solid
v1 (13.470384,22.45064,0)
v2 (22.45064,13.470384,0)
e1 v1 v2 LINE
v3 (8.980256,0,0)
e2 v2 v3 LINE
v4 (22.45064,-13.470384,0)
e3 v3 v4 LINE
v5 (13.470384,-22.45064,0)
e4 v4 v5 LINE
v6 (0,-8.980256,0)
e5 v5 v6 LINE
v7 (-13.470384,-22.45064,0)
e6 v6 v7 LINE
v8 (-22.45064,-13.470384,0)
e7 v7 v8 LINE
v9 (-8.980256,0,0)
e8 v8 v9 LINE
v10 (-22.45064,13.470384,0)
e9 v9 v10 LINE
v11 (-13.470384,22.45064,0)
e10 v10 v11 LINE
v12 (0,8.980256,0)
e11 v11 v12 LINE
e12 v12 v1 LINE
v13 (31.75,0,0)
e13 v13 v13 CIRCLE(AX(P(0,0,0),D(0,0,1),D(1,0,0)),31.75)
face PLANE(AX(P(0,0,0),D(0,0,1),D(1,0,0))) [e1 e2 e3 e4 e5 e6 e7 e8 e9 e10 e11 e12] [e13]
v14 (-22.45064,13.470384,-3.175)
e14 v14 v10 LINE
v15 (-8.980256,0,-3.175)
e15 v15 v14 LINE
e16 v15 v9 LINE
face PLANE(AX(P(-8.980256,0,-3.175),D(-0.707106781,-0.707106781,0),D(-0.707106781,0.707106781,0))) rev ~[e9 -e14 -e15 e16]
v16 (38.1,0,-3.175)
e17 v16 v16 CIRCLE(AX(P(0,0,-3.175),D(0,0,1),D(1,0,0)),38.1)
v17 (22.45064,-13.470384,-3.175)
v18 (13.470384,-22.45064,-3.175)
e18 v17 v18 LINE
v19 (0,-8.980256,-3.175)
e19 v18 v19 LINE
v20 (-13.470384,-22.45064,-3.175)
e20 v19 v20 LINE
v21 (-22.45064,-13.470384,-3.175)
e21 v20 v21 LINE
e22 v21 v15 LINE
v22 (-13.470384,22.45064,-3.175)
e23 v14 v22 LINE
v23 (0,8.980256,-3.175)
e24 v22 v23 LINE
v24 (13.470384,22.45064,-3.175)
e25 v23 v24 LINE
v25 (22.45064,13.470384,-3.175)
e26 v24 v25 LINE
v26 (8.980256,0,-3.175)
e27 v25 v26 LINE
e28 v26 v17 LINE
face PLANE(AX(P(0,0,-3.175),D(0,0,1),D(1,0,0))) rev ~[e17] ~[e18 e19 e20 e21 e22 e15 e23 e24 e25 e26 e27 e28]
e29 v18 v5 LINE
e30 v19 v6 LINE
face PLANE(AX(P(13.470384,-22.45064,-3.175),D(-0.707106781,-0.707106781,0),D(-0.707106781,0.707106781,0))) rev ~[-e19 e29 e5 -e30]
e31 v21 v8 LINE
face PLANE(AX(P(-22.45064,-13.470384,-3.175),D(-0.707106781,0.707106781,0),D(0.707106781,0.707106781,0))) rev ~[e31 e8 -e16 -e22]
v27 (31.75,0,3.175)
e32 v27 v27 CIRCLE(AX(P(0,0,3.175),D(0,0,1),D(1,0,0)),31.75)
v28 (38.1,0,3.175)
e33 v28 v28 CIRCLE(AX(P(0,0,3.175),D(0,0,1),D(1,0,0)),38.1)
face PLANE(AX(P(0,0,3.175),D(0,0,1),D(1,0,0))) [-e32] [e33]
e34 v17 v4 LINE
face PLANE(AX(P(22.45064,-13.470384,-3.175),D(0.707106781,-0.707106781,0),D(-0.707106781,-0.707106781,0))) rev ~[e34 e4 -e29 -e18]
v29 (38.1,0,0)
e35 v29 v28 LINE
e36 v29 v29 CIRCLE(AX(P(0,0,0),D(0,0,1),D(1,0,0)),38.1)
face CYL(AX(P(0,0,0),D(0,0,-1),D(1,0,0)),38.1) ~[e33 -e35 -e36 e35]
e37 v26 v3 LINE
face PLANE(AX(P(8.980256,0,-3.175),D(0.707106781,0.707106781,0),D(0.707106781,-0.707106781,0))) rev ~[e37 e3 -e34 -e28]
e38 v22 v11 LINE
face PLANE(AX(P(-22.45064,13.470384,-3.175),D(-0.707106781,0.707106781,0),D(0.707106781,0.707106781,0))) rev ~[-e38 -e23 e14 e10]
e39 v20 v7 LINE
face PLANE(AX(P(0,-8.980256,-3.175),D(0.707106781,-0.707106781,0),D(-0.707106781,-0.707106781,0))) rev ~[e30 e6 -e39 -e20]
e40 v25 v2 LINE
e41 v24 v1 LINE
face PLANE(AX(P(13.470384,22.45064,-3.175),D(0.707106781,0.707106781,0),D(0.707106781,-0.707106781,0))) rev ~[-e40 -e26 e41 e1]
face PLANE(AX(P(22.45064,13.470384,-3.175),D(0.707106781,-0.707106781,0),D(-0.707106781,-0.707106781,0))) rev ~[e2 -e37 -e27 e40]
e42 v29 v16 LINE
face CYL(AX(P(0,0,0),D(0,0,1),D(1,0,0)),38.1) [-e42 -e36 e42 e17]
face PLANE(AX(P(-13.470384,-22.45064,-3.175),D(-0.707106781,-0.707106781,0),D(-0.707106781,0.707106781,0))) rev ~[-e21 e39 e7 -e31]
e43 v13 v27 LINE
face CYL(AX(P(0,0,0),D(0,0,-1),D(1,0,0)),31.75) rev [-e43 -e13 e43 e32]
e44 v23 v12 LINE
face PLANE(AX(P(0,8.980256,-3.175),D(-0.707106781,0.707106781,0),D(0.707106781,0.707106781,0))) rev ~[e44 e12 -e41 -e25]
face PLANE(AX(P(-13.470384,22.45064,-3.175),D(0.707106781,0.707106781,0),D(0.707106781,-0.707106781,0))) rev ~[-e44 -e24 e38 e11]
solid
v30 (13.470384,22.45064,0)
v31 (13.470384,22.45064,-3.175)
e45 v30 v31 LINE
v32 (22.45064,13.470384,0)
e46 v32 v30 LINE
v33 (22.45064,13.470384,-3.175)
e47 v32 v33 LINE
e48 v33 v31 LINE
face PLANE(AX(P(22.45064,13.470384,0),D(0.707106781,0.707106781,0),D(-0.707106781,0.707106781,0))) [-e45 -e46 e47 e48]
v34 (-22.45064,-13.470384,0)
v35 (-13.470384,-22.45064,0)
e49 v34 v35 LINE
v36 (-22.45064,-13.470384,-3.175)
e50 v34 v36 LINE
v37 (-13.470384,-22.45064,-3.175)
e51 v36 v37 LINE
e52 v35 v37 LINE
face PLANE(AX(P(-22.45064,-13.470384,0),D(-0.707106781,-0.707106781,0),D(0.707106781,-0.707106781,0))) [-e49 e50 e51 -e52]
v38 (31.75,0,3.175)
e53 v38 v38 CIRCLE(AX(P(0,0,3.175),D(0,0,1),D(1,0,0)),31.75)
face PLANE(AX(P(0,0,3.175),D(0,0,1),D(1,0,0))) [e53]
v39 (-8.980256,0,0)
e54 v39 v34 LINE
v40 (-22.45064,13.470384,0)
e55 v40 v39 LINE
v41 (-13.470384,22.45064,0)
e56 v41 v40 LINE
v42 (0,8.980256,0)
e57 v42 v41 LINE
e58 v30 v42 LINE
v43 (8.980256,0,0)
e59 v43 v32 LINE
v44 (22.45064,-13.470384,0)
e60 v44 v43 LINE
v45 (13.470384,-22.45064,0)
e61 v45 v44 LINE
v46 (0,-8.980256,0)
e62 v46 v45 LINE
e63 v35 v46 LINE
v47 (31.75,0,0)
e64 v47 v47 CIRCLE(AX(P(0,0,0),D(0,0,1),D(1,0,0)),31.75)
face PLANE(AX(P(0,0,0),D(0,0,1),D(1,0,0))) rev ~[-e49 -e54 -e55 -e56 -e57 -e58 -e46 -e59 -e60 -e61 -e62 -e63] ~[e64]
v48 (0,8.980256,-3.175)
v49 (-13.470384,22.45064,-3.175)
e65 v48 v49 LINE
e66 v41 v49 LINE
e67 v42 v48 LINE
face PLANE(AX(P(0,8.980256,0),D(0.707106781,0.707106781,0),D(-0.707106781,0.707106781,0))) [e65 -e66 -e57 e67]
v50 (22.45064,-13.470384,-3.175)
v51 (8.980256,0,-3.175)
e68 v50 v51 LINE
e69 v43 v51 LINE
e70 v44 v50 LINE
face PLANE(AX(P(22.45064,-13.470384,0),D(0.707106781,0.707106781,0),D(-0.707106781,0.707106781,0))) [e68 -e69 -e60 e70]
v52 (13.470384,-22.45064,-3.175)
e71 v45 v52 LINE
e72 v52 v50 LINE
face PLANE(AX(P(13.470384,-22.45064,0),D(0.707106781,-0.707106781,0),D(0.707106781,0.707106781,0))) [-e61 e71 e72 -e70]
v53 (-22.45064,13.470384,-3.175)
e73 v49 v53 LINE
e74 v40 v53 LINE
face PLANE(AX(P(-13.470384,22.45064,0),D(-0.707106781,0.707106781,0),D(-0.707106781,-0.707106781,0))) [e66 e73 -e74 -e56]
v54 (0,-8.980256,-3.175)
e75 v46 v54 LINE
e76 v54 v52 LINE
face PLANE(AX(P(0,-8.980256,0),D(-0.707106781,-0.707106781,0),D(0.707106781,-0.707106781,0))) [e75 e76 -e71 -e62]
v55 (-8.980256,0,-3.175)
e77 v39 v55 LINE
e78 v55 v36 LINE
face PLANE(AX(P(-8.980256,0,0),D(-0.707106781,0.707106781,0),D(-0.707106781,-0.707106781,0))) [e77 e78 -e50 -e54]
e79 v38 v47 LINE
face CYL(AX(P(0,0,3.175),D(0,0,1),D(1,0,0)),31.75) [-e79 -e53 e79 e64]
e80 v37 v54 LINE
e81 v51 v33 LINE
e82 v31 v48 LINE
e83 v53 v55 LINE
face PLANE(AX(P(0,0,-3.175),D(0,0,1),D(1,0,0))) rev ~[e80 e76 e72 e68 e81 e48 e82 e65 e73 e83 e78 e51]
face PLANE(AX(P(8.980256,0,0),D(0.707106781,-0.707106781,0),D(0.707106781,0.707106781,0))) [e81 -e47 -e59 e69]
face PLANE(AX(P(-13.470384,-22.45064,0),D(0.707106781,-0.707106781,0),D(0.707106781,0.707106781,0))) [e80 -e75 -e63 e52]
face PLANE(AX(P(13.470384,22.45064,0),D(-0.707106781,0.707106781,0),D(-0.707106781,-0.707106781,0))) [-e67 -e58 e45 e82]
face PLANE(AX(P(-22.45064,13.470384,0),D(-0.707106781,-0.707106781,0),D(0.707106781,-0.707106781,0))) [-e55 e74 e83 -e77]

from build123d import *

# Parameters (mm, degrees)
F0_R      = 38.1
F1_DEPTH  = 3.175
F2_DEPTH  = 3.175
F3_R      = 38.1
F3_R_2    = 31.75
F4_DEPTH  = 3.175
F5_R      = 38.1
F5_R_2    = 31.75
F6_DEPTH  = 3.175
F8_DEPTH  = 3.175
F10_DEPTH = 3.175


with BuildPart() as f1:
    # F0 (on Top) → F1 (new body)
    with BuildSketch(Plane.XY):
        Circle(F0_R)
    extrude(amount=F1_DEPTH)

    # F3 (on face) → F4 (cut, through all)
    with BuildSketch(Plane.XY.offset(3.175)):
        Circle(F3_R)
        Circle(F3_R_2, mode=Mode.SUBTRACT)
    extrude(amount=-F4_DEPTH, mode=Mode.SUBTRACT)

    # F9 (on face) → F10 (join, through all)
    with BuildSketch(Plane.XY):
        Polygon((-13.4703841816, -22.4506403027), (0, -8.9802561211), (13.4703841816, -22.4506403027), (22.4506403027, -13.4703841816), (8.9802561211, 0), (22.4506403027, 13.4703841816), (13.4703841816, 22.4506403027), (0, 8.9802561211), (-13.4703841816, 22.4506403027), (-22.4506403027, 13.4703841816), (-8.9802561211, 0), (-22.4506403027, -13.4703841816), align=None)
    extrude(amount=-F10_DEPTH)


with BuildPart() as f2:
    # F0 (on Top) → F2 (new body)
    with BuildSketch(Plane.XY):
        Circle(F0_R)
    extrude(amount=-F2_DEPTH)

    # F5 (on face) → F6 (join, through all)
    with BuildSketch(Plane.XY):
        Circle(F5_R)
        Circle(F5_R_2, mode=Mode.SUBTRACT)
    extrude(amount=F6_DEPTH)

    # F7 (on face) → F8 (cut, through all)
    with BuildSketch(Plane(origin=(0, 0, -3.175), x_dir=(1, 0, 0), z_dir=(0, 0, -1))):
        Polygon((13.4703841816, 22.4506403027), (0, 8.9802561211), (-13.4703841816, 22.4506403027), (-22.4506403027, 13.4703841816), (-8.9802561211, 0), (-22.4506403027, -13.4703841816), (-13.4703841816, -22.4506403027), (0, -8.9802561211), (13.4703841816, -22.4506403027), (22.4506403027, -13.4703841816), (8.9802561211, 0), (22.4506403027, 13.4703841816), align=None)
    extrude(amount=-F8_DEPTH, mode=Mode.SUBTRACT)


solid = Compound([f1.part, f2.part])
